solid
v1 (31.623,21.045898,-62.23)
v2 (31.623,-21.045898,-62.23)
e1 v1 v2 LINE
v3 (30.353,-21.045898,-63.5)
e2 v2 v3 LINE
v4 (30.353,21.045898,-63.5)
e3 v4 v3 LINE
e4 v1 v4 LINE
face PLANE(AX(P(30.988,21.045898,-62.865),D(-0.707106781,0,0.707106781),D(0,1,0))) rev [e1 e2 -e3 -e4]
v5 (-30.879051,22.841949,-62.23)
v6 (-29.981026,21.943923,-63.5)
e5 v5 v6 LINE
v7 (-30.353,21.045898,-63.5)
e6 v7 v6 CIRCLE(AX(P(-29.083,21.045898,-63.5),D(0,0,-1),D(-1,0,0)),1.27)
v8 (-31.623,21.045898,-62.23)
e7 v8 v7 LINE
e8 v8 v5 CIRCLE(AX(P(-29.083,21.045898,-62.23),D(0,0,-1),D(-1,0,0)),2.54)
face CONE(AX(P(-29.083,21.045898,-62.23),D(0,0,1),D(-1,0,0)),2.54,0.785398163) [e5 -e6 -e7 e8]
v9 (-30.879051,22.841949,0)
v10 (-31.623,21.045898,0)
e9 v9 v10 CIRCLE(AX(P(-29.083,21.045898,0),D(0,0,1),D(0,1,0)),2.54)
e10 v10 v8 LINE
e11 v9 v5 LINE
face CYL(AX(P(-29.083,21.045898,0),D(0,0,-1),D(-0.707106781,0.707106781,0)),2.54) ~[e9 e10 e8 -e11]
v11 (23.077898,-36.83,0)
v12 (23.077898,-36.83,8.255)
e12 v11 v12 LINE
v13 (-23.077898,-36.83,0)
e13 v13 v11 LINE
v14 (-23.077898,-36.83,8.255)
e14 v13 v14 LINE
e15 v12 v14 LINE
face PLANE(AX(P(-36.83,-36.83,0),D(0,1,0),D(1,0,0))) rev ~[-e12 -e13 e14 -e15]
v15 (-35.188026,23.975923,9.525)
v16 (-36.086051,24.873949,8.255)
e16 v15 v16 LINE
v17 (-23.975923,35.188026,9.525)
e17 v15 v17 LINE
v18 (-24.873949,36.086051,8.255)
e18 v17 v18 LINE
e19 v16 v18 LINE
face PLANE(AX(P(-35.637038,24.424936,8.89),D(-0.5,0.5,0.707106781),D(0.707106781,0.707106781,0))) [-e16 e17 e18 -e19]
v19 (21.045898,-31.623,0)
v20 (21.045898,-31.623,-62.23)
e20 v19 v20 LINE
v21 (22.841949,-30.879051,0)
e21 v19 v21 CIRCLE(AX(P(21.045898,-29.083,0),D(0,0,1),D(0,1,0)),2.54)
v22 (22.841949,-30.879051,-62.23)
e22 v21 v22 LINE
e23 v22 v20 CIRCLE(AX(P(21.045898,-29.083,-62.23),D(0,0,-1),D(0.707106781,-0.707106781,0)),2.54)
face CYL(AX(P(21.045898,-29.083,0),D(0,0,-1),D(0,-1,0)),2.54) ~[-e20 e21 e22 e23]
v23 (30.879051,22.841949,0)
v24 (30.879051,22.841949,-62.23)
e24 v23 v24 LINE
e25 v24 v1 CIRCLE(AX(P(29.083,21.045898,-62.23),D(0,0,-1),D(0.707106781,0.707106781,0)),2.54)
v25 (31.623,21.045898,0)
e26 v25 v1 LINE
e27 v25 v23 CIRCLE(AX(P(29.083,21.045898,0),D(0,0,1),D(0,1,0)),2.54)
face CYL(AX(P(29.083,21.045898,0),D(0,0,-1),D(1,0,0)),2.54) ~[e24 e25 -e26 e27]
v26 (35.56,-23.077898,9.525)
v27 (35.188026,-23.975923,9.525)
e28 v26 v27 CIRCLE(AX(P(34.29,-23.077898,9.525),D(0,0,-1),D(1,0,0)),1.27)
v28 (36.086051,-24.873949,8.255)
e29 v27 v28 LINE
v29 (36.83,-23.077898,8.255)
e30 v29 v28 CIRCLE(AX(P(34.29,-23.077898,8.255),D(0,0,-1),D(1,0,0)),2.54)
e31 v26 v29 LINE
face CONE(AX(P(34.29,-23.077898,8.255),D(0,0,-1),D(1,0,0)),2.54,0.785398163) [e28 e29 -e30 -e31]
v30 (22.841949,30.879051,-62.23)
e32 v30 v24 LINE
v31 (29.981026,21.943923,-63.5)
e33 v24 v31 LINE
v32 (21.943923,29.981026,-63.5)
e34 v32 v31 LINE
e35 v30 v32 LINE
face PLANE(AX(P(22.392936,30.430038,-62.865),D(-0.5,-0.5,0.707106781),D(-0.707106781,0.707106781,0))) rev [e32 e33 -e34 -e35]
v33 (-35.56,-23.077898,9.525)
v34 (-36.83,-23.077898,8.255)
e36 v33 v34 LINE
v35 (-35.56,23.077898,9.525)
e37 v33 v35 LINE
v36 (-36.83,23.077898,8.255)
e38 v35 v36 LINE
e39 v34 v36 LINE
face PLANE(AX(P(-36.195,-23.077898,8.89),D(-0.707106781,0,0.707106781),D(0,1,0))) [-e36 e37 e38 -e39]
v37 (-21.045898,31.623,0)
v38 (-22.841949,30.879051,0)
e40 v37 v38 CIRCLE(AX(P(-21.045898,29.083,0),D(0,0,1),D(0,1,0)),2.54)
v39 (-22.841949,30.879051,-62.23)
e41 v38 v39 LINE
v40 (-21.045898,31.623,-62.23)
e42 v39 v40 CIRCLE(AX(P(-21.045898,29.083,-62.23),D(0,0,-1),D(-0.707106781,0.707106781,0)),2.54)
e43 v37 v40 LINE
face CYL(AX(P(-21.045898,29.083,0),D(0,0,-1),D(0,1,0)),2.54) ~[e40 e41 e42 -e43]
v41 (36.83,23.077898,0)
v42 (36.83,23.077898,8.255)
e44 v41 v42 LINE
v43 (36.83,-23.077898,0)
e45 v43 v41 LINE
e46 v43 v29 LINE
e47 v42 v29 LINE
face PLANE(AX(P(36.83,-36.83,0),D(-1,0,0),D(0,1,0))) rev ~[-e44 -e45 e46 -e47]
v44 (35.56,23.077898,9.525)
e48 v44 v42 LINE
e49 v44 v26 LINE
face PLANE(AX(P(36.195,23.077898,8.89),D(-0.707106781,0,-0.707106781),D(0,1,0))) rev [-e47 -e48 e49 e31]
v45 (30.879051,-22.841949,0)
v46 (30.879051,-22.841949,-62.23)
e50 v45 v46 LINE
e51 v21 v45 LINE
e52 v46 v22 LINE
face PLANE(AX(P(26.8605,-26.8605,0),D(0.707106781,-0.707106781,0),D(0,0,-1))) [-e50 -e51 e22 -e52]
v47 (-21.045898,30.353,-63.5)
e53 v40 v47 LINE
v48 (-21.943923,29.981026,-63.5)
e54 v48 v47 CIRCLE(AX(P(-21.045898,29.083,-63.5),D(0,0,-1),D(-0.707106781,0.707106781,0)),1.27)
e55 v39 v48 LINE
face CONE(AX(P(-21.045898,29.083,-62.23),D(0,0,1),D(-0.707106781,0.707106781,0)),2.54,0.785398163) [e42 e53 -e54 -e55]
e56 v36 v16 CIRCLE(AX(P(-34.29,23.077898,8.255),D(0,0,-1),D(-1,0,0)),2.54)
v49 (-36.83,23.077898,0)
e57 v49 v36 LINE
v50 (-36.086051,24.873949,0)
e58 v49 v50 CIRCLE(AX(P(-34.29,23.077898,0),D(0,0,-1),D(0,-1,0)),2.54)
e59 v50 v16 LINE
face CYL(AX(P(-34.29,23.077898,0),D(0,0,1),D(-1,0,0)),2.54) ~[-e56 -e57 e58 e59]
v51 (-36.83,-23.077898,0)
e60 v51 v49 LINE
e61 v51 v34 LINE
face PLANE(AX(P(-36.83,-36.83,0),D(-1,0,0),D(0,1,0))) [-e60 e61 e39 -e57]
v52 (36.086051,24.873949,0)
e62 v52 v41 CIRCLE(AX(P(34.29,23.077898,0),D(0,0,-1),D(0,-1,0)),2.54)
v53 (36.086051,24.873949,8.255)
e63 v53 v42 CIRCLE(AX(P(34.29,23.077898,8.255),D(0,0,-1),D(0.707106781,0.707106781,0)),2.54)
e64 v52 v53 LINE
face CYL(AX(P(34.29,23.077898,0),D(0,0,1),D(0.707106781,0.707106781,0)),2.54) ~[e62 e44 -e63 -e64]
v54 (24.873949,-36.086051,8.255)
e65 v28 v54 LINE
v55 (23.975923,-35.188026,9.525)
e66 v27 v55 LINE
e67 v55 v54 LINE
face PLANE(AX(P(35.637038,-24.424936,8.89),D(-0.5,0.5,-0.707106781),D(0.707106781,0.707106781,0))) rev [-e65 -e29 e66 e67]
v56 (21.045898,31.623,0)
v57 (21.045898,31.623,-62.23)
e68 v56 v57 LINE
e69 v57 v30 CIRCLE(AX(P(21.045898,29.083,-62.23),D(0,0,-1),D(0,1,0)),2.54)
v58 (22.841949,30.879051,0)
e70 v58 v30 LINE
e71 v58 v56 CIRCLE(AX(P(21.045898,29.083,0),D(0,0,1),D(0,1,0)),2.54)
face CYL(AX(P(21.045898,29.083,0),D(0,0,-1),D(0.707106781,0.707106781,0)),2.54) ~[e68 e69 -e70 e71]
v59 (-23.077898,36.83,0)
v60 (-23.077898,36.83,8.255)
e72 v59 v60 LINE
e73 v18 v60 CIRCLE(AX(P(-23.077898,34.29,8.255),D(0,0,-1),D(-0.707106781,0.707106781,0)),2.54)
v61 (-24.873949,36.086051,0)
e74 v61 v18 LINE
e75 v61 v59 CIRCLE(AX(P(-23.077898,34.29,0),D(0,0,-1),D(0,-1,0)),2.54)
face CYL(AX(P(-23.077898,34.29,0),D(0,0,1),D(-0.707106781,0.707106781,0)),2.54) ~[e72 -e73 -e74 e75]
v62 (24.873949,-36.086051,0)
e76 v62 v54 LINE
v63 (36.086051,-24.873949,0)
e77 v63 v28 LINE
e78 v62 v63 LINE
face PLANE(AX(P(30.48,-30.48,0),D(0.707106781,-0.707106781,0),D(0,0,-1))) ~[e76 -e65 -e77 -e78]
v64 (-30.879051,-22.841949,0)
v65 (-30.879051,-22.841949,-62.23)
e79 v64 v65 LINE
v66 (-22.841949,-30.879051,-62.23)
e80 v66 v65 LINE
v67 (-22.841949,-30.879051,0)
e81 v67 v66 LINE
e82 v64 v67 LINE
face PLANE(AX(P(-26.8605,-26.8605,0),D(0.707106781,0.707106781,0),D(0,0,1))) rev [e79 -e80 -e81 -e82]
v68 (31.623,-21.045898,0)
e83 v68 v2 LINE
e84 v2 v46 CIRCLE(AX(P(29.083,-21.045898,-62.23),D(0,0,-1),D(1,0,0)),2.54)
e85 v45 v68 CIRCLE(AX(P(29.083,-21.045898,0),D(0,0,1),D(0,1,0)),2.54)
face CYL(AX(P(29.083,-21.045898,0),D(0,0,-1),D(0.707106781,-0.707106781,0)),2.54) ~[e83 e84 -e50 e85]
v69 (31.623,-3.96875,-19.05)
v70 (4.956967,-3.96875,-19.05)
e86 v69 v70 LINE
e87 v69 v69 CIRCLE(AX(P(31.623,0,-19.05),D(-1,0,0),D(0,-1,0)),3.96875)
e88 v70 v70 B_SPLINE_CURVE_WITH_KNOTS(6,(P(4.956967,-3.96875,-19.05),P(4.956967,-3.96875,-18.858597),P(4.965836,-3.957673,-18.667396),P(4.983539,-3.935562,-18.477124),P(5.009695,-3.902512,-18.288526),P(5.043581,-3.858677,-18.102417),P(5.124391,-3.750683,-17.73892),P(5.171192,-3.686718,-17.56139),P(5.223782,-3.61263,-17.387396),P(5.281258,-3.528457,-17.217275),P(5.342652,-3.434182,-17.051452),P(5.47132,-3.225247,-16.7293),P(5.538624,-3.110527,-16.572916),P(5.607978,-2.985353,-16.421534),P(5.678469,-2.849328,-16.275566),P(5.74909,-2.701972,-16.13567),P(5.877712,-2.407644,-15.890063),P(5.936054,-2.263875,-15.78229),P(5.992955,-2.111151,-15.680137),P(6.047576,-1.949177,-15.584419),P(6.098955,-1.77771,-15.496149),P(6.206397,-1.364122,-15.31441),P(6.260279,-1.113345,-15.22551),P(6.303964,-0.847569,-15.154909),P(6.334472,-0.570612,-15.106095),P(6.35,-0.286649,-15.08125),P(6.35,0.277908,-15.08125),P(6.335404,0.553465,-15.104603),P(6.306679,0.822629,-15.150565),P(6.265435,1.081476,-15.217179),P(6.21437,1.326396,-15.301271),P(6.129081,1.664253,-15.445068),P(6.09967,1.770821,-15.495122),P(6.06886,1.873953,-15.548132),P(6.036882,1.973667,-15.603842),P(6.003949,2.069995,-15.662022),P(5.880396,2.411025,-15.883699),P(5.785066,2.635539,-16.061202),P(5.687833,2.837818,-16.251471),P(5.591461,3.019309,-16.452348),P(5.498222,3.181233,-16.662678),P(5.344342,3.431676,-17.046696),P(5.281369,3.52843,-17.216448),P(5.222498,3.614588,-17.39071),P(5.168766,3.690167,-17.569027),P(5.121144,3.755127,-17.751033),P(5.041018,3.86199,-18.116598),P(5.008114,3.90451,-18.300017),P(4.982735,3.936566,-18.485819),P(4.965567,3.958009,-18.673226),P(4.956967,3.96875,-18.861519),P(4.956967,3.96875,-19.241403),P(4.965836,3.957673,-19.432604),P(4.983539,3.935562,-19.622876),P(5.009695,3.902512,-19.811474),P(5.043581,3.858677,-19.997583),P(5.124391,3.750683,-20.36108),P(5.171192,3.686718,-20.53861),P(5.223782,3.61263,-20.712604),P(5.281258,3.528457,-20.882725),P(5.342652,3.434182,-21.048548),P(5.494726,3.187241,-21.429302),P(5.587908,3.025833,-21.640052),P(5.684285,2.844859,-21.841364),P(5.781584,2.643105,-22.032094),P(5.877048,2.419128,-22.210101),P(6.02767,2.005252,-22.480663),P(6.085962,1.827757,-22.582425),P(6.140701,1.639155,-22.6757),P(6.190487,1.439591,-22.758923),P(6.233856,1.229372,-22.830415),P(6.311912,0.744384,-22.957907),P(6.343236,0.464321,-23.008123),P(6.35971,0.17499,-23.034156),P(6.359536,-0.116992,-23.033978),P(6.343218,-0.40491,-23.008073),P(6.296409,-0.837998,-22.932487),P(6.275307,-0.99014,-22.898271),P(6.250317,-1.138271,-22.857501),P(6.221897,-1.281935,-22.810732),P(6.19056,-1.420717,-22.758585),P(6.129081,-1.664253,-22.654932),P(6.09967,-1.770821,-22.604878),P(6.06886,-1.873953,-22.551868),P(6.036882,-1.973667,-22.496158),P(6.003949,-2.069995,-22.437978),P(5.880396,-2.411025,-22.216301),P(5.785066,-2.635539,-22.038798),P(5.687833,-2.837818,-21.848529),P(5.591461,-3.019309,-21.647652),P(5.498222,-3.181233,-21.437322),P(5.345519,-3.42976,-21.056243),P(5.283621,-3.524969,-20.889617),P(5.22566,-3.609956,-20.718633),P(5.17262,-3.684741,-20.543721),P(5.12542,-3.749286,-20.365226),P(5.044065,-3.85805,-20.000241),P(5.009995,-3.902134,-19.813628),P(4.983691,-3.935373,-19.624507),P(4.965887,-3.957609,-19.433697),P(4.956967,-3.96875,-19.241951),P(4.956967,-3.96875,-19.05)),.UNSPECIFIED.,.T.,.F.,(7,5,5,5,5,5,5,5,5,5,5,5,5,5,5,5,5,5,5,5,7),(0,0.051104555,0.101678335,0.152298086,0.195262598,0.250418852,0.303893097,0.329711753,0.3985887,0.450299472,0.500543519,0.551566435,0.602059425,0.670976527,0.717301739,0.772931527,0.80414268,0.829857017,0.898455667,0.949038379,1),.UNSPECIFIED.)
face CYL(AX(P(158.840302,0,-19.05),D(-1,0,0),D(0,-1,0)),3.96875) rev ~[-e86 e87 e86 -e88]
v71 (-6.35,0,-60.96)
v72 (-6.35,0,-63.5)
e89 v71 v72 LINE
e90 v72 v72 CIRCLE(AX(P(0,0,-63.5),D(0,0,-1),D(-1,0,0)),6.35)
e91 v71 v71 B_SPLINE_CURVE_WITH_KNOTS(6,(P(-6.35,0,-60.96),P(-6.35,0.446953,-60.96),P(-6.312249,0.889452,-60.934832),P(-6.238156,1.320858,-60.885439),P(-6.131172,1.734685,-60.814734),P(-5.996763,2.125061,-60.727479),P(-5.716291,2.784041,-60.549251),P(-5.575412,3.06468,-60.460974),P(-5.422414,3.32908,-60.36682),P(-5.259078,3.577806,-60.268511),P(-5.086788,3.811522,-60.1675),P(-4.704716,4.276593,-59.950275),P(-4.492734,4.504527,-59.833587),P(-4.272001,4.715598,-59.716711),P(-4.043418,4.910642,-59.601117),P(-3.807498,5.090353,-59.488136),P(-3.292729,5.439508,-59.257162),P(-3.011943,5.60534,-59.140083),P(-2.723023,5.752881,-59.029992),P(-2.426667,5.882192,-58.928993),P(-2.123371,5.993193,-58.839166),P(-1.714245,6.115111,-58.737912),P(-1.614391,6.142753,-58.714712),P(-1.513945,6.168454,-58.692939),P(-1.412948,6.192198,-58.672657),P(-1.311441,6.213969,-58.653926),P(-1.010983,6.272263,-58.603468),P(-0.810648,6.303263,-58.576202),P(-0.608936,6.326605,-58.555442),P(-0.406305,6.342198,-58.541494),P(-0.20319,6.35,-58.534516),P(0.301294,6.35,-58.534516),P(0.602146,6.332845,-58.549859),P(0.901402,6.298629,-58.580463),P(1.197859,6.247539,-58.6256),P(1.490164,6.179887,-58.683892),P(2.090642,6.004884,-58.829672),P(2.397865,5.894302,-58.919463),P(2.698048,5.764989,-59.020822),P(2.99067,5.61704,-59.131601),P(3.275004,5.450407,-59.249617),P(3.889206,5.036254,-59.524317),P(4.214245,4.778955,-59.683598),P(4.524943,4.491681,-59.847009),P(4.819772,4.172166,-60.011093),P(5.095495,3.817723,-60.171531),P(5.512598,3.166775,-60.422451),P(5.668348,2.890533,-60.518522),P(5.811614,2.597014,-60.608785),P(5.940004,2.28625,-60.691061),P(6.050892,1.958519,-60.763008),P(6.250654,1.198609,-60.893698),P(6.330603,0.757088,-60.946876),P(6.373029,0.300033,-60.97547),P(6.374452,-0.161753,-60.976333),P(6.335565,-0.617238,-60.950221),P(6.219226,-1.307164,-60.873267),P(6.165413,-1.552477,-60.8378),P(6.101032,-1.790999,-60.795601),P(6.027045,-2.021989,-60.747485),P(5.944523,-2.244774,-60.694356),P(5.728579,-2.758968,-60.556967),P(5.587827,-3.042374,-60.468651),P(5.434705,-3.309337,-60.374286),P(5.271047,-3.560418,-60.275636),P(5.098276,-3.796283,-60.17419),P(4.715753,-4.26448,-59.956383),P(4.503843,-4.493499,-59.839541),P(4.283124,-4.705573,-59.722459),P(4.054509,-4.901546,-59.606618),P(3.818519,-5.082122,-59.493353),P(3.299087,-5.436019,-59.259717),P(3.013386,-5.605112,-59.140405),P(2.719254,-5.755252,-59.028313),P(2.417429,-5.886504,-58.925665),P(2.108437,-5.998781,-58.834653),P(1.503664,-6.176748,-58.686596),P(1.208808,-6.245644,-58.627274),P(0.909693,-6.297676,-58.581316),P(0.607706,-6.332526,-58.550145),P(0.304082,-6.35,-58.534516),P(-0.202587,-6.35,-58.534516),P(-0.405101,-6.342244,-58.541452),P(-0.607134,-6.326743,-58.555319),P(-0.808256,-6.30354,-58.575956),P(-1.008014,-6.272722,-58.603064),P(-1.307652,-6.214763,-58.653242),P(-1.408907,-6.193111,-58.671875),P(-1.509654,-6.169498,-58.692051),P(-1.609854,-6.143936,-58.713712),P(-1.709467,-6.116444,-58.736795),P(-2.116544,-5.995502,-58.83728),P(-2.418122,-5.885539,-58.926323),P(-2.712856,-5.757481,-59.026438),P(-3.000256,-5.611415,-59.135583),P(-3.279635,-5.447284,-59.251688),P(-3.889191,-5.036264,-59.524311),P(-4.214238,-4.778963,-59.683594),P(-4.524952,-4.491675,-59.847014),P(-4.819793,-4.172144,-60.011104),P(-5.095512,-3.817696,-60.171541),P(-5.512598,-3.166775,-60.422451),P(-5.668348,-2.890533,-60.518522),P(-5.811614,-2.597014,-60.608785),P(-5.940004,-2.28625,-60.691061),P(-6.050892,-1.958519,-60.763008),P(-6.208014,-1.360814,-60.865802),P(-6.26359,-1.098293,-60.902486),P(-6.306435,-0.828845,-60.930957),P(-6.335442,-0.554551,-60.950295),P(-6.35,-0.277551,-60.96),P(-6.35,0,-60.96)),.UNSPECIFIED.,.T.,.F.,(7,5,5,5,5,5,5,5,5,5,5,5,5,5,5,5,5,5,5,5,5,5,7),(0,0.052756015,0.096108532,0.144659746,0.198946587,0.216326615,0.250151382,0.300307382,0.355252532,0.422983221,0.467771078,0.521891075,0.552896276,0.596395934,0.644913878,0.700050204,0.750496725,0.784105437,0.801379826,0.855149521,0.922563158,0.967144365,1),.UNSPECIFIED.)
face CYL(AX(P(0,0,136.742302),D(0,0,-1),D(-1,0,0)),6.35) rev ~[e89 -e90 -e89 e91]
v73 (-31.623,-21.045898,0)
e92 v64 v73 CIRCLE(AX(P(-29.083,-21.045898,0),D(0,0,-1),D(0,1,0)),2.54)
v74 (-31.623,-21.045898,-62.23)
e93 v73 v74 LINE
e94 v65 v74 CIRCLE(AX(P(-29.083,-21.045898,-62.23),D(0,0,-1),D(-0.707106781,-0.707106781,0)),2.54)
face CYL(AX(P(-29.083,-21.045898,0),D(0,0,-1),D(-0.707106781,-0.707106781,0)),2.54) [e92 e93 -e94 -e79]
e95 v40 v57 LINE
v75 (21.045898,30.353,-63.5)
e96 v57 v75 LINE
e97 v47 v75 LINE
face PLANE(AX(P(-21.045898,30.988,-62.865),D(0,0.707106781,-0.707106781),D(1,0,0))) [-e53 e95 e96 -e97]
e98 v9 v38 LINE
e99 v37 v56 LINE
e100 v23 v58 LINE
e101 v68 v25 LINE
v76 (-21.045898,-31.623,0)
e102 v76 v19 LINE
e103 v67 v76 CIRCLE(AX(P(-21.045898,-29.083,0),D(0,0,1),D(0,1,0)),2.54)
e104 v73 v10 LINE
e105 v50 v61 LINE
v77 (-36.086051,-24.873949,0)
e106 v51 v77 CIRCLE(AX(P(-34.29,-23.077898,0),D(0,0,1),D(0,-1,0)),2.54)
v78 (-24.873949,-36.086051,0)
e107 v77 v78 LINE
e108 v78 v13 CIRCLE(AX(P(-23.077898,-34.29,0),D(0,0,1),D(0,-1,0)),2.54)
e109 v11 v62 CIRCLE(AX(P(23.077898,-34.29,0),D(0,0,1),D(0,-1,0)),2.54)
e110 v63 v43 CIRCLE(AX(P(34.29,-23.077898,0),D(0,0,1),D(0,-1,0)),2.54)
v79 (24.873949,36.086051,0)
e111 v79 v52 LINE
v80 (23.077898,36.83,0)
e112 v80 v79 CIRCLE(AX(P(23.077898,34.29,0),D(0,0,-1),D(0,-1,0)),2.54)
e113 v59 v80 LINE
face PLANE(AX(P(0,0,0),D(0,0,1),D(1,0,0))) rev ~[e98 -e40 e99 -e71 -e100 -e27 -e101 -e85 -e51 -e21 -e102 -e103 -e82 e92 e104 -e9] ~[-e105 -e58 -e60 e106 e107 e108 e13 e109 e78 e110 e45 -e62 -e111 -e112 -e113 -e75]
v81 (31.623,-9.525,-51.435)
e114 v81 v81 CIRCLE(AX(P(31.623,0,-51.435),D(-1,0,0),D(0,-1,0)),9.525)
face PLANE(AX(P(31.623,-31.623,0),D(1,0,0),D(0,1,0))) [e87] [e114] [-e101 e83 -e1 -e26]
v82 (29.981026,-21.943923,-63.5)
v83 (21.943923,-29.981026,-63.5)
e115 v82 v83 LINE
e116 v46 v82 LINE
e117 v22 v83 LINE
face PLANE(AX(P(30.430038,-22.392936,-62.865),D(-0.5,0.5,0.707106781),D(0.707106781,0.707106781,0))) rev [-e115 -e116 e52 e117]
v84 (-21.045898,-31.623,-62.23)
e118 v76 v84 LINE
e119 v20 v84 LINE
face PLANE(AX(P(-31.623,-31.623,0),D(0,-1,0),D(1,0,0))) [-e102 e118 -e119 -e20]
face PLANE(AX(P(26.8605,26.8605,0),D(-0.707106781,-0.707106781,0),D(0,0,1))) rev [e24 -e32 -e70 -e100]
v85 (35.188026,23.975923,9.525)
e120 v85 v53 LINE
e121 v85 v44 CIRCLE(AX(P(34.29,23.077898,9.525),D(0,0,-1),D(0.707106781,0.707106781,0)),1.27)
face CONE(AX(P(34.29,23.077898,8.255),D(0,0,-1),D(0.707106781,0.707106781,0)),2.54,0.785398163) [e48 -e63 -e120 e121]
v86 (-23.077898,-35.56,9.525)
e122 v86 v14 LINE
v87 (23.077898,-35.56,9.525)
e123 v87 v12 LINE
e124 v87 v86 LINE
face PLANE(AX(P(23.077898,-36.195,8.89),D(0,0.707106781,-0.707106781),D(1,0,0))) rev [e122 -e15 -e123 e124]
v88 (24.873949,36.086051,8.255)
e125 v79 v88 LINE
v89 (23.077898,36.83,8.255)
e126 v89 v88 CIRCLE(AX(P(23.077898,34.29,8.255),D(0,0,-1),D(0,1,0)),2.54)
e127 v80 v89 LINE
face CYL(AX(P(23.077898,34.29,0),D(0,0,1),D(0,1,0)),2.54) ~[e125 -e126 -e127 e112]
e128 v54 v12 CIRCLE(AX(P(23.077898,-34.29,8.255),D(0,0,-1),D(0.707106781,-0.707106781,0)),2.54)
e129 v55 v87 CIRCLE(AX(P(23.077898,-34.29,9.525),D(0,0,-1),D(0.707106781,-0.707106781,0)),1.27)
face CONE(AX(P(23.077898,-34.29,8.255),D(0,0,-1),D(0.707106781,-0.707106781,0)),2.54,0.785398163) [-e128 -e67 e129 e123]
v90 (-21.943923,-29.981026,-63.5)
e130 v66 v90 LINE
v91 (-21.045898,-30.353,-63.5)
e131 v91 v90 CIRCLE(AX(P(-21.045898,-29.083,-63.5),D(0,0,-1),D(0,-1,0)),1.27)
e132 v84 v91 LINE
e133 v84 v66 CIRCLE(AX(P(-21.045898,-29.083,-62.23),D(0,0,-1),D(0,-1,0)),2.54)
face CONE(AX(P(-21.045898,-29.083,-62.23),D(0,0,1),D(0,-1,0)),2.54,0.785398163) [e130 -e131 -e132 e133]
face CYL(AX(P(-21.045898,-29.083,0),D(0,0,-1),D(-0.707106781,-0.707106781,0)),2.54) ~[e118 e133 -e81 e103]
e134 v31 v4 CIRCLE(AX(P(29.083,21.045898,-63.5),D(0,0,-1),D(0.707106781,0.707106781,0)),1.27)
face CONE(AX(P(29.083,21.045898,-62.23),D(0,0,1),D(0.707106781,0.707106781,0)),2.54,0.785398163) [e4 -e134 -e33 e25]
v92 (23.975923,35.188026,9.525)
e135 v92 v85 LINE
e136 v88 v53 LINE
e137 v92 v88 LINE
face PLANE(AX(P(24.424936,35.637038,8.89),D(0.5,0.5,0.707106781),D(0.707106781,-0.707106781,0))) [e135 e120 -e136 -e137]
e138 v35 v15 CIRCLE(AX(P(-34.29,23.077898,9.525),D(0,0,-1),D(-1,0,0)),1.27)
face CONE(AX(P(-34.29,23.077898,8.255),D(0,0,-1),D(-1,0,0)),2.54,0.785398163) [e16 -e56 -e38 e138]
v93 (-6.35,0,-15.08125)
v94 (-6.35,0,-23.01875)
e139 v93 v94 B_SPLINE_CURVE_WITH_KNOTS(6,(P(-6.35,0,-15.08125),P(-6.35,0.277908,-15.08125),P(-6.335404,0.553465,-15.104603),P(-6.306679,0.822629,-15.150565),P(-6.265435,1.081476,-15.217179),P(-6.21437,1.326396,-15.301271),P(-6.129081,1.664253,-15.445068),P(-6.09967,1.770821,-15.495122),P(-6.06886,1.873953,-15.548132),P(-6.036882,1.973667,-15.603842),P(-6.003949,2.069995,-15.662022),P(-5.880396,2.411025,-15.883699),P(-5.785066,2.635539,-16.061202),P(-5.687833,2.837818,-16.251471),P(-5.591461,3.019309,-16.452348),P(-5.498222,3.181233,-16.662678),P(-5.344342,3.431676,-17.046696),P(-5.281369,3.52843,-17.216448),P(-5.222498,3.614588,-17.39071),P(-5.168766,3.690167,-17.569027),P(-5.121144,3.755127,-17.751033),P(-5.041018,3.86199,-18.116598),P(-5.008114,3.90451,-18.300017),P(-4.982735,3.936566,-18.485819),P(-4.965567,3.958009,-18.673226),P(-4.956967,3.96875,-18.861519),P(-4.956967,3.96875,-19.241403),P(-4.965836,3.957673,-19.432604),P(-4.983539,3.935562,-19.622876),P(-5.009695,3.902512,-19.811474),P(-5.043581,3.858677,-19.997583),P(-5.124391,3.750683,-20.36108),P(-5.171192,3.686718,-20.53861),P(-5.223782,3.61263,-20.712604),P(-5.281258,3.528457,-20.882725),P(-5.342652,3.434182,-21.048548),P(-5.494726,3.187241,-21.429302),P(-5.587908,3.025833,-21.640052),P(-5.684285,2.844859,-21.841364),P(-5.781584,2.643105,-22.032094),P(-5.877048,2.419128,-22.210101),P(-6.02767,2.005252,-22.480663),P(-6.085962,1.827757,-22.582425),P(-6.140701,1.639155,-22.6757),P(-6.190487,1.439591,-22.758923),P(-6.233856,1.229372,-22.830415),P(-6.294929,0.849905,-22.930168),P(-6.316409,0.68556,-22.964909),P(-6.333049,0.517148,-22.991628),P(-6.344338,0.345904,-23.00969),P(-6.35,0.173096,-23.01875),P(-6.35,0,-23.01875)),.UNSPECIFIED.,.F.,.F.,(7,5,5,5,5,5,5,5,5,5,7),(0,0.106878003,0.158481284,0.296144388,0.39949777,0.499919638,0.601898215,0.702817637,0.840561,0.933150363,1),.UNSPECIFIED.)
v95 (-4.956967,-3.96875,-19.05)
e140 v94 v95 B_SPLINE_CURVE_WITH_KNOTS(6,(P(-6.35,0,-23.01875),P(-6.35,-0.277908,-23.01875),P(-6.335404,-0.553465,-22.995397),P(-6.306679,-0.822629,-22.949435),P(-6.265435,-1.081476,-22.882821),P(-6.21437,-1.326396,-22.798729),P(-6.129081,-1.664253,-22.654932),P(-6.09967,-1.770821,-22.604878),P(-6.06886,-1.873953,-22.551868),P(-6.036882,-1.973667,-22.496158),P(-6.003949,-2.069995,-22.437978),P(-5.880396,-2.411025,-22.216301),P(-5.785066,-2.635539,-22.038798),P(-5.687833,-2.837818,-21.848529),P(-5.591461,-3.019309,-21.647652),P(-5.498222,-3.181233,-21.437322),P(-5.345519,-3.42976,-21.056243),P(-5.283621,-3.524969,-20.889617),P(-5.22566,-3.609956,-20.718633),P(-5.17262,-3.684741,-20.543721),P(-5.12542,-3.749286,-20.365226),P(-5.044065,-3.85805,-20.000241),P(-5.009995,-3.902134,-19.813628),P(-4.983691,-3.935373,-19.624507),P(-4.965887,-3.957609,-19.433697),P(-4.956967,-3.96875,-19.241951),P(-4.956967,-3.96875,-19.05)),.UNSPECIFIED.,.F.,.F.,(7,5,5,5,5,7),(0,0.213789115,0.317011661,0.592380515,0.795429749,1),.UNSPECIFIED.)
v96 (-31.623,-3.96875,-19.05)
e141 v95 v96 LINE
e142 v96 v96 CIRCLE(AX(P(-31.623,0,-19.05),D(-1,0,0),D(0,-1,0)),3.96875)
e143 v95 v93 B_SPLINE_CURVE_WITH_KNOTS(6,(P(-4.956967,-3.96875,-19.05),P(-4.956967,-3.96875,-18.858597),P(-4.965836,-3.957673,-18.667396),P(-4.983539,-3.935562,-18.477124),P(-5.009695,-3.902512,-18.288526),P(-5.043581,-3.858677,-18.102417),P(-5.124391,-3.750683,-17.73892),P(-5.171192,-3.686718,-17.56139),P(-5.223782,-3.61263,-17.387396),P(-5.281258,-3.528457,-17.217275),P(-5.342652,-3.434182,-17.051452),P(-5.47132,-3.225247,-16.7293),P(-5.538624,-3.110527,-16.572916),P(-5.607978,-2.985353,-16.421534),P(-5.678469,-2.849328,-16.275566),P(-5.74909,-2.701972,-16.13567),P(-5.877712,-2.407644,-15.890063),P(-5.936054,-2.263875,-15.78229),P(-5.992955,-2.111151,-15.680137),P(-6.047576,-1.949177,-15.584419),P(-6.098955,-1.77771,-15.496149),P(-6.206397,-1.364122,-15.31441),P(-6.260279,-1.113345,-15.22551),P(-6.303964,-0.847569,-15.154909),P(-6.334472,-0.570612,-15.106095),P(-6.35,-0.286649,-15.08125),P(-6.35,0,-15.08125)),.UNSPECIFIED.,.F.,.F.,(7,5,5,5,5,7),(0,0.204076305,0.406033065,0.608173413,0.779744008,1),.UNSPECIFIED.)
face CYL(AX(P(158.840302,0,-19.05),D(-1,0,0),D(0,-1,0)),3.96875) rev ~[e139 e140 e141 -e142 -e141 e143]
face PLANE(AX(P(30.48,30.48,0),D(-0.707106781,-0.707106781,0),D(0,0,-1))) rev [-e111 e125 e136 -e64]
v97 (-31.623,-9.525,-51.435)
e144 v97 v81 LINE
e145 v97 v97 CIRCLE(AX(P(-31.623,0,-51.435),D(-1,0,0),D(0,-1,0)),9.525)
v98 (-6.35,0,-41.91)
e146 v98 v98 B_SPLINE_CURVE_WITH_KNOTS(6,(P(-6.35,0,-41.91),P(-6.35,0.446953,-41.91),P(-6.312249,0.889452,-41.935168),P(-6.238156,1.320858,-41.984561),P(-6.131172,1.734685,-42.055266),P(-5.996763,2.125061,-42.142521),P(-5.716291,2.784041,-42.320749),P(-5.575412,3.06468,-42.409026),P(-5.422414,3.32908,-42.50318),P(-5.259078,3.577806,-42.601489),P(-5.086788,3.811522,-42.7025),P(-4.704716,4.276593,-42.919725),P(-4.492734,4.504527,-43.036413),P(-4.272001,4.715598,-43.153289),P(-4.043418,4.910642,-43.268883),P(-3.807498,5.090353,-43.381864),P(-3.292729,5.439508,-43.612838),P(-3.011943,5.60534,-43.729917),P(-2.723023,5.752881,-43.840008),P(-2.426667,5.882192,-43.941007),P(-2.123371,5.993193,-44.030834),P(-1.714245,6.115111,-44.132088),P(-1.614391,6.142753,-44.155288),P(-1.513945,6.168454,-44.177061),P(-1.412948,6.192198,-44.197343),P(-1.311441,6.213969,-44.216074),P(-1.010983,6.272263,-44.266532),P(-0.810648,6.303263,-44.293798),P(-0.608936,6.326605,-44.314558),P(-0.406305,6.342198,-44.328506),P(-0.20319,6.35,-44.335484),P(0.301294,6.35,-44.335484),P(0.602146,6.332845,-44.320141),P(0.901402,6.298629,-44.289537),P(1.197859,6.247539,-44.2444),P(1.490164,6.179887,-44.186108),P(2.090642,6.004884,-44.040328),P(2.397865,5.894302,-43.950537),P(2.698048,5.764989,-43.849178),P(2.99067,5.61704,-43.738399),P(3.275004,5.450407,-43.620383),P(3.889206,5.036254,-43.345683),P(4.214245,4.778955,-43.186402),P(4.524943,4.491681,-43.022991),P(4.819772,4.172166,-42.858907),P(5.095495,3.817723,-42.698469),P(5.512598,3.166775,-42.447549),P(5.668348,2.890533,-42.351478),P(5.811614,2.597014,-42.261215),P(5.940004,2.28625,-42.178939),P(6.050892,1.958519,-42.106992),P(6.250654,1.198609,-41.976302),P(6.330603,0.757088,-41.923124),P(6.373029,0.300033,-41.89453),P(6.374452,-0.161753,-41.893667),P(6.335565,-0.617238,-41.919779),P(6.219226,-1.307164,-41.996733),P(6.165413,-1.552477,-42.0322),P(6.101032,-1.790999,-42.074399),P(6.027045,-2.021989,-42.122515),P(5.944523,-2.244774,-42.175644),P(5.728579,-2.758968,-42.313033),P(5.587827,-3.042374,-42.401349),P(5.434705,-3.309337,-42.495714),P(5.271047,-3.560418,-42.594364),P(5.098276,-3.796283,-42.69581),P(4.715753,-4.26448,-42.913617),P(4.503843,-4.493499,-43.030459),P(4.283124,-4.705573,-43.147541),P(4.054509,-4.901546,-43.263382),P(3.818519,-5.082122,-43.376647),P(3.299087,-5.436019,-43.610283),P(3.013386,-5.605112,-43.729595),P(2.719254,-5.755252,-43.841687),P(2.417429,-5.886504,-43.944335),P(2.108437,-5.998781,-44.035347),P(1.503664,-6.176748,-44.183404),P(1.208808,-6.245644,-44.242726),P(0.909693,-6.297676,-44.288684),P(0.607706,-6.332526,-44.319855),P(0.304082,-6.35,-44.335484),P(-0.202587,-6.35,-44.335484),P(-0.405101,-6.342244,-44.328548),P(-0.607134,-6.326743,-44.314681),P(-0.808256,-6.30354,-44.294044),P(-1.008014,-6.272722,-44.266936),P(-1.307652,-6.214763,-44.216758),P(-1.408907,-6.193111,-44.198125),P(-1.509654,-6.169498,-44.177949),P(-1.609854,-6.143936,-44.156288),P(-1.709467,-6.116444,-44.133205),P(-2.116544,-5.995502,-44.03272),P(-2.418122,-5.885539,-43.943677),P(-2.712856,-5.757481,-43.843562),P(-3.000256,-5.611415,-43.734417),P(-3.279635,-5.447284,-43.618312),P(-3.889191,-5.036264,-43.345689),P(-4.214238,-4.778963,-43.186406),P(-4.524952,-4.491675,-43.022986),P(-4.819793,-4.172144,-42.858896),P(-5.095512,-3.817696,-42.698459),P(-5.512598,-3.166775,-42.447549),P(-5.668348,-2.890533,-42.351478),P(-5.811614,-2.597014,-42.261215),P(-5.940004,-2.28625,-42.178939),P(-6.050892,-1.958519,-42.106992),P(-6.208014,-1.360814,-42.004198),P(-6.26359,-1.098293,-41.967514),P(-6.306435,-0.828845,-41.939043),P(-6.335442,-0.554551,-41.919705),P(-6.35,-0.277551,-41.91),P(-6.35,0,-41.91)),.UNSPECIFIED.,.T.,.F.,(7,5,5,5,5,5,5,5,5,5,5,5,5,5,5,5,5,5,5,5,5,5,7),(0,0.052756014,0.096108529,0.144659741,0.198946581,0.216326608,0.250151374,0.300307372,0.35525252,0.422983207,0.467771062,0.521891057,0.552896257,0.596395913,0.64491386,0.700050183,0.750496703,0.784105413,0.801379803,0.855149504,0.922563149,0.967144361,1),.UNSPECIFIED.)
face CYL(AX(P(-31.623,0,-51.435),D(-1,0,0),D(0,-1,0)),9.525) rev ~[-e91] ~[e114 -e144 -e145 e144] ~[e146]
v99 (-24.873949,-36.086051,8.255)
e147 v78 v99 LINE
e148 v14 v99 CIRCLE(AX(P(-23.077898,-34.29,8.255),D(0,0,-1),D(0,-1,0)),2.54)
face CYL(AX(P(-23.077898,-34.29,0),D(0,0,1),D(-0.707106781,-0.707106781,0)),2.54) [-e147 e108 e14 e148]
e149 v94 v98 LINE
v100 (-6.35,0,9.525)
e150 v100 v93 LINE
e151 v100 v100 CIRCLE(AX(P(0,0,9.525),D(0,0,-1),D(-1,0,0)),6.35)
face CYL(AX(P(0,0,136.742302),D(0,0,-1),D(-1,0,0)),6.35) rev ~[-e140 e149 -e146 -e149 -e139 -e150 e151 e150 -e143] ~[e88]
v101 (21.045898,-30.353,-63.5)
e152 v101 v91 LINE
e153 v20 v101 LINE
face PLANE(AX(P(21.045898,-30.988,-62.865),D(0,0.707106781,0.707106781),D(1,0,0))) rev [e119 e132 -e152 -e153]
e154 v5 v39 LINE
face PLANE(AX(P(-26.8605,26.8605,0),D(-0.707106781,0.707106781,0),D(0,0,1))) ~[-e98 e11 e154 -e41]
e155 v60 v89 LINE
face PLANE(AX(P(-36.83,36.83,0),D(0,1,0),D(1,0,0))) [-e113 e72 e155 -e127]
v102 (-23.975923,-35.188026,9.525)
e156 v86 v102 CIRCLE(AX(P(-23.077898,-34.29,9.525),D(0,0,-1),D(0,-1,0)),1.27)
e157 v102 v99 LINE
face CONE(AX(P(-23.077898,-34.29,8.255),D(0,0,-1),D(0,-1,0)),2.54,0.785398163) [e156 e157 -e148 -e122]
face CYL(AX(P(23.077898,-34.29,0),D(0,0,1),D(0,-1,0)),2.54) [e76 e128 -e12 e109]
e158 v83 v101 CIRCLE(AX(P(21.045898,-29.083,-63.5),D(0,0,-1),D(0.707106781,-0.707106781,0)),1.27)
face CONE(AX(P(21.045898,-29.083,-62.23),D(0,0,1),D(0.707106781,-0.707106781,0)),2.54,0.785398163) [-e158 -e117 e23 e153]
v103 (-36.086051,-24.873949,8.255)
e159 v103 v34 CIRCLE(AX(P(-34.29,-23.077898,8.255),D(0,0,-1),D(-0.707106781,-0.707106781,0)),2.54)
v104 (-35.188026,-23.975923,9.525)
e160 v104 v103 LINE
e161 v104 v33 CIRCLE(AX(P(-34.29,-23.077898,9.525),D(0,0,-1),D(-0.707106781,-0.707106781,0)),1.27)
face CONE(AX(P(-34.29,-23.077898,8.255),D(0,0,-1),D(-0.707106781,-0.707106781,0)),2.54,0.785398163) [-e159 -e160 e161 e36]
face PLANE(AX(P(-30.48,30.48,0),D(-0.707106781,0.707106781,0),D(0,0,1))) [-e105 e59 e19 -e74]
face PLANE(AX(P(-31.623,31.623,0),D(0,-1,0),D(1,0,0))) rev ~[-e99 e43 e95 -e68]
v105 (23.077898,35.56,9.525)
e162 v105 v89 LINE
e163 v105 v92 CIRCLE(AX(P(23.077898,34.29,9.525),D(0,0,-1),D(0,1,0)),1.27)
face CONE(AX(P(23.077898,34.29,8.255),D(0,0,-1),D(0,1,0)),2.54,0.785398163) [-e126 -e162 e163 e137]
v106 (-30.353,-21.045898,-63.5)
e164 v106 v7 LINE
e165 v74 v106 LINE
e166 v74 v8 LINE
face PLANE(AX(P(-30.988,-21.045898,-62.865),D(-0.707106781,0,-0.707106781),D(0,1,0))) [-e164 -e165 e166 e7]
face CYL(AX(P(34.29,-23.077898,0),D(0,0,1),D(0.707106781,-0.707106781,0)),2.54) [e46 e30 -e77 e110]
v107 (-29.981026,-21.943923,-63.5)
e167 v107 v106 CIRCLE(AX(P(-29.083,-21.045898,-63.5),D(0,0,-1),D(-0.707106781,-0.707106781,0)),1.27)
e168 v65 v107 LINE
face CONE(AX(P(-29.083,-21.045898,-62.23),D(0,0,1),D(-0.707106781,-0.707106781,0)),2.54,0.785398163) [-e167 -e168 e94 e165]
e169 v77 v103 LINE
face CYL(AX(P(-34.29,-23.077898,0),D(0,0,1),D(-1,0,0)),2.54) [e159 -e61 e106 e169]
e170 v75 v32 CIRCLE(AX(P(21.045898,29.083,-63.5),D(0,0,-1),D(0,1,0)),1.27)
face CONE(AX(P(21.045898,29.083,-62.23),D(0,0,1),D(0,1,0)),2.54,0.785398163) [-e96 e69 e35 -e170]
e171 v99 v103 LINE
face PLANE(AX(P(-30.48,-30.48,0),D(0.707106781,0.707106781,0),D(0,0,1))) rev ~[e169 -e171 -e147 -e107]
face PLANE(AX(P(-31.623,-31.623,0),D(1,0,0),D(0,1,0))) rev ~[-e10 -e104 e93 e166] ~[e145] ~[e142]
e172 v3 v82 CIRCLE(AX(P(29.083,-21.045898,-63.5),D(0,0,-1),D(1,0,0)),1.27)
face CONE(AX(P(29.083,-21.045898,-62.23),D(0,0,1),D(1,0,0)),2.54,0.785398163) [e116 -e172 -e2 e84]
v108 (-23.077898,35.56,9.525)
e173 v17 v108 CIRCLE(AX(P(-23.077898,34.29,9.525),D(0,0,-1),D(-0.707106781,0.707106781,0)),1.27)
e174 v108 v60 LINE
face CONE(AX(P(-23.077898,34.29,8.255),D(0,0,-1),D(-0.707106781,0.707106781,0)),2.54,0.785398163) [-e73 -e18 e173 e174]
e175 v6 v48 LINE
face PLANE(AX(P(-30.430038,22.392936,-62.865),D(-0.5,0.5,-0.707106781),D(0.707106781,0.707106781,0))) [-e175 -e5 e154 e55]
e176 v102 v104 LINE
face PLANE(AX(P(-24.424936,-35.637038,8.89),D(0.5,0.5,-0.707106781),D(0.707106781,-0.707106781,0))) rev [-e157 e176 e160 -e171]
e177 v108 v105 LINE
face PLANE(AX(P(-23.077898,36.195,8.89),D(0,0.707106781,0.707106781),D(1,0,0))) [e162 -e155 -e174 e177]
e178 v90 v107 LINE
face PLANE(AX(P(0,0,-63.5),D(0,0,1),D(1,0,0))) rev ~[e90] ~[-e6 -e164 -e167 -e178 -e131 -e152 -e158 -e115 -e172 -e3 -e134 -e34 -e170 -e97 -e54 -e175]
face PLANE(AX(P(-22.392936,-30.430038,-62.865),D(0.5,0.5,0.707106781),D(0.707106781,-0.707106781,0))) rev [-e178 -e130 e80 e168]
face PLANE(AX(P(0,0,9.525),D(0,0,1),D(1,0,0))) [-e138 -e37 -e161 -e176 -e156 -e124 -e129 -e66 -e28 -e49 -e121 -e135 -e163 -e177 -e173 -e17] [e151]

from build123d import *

# Parameters (mm, degrees)
F0_W     = 63.246
F0_H     = 63.246
F1_DEPTH = 63.5
F2_SIZE  = 9.525
F3_W     = 73.66
F3_H     = 73.66
F4_DEPTH = 9.525
F5_SIZE  = 12.7
F6_R     = 2.54
F7_SIZE  = 1.27
F8_R     = 9.525
F9_DEPTH = 68.454
F11_D    = 12.7
F13_D    = 7.9375


# Not quite as in the source:
# - a length typed as a fraction of an inch, garbled in the dataset ("3 / 203.2 mm" for 3/8 in), is restored


with BuildPart() as f1:
    # F0 (on Top) → F1 (new body)
    with BuildSketch(Plane.XY):
        Rectangle(F0_W, F0_H)
    extrude(amount=-F1_DEPTH)

    # F2
    f2_edges = [f1.edges().sort_by_distance(p)[0] for p in [
        (-31.623, -31.623, -31.75),
        (-31.623, 31.623, -31.75),
        (31.623, -31.623, -31.75),
        (31.623, 31.623, -31.75),
    ]]
    chamfer(f2_edges, length=F2_SIZE)

    # F3 (on face) → F4 (join)
    with BuildSketch(Plane.XY):
        Rectangle(F3_W, F3_H)
    extrude(amount=F4_DEPTH)

    # F5
    f5_edges = [f1.edges().sort_by_distance(p)[0] for p in [
        (36.83, -36.83, 4.7625),
        (-36.83, -36.83, 4.7625),
        (36.83, 36.83, 4.7625),
        (-36.83, 36.83, 4.7625),
    ]]
    chamfer(f5_edges, length=F5_SIZE)

    # F6
    f6_edges = [f1.edges().sort_by_distance(p)[0] for p in [
        (-24.13, -36.83, 4.7625),
        (24.13, -36.83, 4.7625),
        (36.83, -24.13, 4.7625),
        (-36.83, -24.13, 4.7625),
        (36.83, 24.13, 4.7625),
        (24.13, 36.83, 4.7625),
        (-24.13, 36.83, 4.7625),
        (-36.83, 24.13, 4.7625),
        (-22.098, 31.623, -31.75),
        (-31.623, 22.098, -31.75),
        (22.098, 31.623, -31.75),
        (31.623, 22.098, -31.75),
        (-31.623, -22.098, -31.75),
        (-22.098, -31.623, -31.75),
        (31.623, -22.098, -31.75),
        (22.098, -31.623, -31.75),
    ]]
    fillet(f6_edges, radius=F6_R)

    # F7
    f7_edges = [f1.edges().sort_by_distance(p)[0] for p in [
        (-30.48, 30.48, 9.525),
        (-31.623, 0, -63.5),
    ]]
    chamfer(f7_edges, length=F7_SIZE)

    # F8 (on face) → F9 (cut, through all)
    with BuildSketch(Plane(origin=(-31.623, 0, 0), x_dir=(0, -1, 0), z_dir=(-1, 0, 0))):
        with Locations((0, -51.435)):
            Circle(F8_R)
    extrude(amount=-F9_DEPTH, mode=Mode.SUBTRACT)

    # F11 (through all)
    with Locations(Plane.XY.offset(9.525)):
        with Locations((0, 0)):
            Hole(F11_D / 2)

    # F13 (through all)
    with Locations(Plane.YZ.offset(31.623)):
        with Locations((0, -19.05)):
            Hole(F13_D / 2)


solid = f1.part
